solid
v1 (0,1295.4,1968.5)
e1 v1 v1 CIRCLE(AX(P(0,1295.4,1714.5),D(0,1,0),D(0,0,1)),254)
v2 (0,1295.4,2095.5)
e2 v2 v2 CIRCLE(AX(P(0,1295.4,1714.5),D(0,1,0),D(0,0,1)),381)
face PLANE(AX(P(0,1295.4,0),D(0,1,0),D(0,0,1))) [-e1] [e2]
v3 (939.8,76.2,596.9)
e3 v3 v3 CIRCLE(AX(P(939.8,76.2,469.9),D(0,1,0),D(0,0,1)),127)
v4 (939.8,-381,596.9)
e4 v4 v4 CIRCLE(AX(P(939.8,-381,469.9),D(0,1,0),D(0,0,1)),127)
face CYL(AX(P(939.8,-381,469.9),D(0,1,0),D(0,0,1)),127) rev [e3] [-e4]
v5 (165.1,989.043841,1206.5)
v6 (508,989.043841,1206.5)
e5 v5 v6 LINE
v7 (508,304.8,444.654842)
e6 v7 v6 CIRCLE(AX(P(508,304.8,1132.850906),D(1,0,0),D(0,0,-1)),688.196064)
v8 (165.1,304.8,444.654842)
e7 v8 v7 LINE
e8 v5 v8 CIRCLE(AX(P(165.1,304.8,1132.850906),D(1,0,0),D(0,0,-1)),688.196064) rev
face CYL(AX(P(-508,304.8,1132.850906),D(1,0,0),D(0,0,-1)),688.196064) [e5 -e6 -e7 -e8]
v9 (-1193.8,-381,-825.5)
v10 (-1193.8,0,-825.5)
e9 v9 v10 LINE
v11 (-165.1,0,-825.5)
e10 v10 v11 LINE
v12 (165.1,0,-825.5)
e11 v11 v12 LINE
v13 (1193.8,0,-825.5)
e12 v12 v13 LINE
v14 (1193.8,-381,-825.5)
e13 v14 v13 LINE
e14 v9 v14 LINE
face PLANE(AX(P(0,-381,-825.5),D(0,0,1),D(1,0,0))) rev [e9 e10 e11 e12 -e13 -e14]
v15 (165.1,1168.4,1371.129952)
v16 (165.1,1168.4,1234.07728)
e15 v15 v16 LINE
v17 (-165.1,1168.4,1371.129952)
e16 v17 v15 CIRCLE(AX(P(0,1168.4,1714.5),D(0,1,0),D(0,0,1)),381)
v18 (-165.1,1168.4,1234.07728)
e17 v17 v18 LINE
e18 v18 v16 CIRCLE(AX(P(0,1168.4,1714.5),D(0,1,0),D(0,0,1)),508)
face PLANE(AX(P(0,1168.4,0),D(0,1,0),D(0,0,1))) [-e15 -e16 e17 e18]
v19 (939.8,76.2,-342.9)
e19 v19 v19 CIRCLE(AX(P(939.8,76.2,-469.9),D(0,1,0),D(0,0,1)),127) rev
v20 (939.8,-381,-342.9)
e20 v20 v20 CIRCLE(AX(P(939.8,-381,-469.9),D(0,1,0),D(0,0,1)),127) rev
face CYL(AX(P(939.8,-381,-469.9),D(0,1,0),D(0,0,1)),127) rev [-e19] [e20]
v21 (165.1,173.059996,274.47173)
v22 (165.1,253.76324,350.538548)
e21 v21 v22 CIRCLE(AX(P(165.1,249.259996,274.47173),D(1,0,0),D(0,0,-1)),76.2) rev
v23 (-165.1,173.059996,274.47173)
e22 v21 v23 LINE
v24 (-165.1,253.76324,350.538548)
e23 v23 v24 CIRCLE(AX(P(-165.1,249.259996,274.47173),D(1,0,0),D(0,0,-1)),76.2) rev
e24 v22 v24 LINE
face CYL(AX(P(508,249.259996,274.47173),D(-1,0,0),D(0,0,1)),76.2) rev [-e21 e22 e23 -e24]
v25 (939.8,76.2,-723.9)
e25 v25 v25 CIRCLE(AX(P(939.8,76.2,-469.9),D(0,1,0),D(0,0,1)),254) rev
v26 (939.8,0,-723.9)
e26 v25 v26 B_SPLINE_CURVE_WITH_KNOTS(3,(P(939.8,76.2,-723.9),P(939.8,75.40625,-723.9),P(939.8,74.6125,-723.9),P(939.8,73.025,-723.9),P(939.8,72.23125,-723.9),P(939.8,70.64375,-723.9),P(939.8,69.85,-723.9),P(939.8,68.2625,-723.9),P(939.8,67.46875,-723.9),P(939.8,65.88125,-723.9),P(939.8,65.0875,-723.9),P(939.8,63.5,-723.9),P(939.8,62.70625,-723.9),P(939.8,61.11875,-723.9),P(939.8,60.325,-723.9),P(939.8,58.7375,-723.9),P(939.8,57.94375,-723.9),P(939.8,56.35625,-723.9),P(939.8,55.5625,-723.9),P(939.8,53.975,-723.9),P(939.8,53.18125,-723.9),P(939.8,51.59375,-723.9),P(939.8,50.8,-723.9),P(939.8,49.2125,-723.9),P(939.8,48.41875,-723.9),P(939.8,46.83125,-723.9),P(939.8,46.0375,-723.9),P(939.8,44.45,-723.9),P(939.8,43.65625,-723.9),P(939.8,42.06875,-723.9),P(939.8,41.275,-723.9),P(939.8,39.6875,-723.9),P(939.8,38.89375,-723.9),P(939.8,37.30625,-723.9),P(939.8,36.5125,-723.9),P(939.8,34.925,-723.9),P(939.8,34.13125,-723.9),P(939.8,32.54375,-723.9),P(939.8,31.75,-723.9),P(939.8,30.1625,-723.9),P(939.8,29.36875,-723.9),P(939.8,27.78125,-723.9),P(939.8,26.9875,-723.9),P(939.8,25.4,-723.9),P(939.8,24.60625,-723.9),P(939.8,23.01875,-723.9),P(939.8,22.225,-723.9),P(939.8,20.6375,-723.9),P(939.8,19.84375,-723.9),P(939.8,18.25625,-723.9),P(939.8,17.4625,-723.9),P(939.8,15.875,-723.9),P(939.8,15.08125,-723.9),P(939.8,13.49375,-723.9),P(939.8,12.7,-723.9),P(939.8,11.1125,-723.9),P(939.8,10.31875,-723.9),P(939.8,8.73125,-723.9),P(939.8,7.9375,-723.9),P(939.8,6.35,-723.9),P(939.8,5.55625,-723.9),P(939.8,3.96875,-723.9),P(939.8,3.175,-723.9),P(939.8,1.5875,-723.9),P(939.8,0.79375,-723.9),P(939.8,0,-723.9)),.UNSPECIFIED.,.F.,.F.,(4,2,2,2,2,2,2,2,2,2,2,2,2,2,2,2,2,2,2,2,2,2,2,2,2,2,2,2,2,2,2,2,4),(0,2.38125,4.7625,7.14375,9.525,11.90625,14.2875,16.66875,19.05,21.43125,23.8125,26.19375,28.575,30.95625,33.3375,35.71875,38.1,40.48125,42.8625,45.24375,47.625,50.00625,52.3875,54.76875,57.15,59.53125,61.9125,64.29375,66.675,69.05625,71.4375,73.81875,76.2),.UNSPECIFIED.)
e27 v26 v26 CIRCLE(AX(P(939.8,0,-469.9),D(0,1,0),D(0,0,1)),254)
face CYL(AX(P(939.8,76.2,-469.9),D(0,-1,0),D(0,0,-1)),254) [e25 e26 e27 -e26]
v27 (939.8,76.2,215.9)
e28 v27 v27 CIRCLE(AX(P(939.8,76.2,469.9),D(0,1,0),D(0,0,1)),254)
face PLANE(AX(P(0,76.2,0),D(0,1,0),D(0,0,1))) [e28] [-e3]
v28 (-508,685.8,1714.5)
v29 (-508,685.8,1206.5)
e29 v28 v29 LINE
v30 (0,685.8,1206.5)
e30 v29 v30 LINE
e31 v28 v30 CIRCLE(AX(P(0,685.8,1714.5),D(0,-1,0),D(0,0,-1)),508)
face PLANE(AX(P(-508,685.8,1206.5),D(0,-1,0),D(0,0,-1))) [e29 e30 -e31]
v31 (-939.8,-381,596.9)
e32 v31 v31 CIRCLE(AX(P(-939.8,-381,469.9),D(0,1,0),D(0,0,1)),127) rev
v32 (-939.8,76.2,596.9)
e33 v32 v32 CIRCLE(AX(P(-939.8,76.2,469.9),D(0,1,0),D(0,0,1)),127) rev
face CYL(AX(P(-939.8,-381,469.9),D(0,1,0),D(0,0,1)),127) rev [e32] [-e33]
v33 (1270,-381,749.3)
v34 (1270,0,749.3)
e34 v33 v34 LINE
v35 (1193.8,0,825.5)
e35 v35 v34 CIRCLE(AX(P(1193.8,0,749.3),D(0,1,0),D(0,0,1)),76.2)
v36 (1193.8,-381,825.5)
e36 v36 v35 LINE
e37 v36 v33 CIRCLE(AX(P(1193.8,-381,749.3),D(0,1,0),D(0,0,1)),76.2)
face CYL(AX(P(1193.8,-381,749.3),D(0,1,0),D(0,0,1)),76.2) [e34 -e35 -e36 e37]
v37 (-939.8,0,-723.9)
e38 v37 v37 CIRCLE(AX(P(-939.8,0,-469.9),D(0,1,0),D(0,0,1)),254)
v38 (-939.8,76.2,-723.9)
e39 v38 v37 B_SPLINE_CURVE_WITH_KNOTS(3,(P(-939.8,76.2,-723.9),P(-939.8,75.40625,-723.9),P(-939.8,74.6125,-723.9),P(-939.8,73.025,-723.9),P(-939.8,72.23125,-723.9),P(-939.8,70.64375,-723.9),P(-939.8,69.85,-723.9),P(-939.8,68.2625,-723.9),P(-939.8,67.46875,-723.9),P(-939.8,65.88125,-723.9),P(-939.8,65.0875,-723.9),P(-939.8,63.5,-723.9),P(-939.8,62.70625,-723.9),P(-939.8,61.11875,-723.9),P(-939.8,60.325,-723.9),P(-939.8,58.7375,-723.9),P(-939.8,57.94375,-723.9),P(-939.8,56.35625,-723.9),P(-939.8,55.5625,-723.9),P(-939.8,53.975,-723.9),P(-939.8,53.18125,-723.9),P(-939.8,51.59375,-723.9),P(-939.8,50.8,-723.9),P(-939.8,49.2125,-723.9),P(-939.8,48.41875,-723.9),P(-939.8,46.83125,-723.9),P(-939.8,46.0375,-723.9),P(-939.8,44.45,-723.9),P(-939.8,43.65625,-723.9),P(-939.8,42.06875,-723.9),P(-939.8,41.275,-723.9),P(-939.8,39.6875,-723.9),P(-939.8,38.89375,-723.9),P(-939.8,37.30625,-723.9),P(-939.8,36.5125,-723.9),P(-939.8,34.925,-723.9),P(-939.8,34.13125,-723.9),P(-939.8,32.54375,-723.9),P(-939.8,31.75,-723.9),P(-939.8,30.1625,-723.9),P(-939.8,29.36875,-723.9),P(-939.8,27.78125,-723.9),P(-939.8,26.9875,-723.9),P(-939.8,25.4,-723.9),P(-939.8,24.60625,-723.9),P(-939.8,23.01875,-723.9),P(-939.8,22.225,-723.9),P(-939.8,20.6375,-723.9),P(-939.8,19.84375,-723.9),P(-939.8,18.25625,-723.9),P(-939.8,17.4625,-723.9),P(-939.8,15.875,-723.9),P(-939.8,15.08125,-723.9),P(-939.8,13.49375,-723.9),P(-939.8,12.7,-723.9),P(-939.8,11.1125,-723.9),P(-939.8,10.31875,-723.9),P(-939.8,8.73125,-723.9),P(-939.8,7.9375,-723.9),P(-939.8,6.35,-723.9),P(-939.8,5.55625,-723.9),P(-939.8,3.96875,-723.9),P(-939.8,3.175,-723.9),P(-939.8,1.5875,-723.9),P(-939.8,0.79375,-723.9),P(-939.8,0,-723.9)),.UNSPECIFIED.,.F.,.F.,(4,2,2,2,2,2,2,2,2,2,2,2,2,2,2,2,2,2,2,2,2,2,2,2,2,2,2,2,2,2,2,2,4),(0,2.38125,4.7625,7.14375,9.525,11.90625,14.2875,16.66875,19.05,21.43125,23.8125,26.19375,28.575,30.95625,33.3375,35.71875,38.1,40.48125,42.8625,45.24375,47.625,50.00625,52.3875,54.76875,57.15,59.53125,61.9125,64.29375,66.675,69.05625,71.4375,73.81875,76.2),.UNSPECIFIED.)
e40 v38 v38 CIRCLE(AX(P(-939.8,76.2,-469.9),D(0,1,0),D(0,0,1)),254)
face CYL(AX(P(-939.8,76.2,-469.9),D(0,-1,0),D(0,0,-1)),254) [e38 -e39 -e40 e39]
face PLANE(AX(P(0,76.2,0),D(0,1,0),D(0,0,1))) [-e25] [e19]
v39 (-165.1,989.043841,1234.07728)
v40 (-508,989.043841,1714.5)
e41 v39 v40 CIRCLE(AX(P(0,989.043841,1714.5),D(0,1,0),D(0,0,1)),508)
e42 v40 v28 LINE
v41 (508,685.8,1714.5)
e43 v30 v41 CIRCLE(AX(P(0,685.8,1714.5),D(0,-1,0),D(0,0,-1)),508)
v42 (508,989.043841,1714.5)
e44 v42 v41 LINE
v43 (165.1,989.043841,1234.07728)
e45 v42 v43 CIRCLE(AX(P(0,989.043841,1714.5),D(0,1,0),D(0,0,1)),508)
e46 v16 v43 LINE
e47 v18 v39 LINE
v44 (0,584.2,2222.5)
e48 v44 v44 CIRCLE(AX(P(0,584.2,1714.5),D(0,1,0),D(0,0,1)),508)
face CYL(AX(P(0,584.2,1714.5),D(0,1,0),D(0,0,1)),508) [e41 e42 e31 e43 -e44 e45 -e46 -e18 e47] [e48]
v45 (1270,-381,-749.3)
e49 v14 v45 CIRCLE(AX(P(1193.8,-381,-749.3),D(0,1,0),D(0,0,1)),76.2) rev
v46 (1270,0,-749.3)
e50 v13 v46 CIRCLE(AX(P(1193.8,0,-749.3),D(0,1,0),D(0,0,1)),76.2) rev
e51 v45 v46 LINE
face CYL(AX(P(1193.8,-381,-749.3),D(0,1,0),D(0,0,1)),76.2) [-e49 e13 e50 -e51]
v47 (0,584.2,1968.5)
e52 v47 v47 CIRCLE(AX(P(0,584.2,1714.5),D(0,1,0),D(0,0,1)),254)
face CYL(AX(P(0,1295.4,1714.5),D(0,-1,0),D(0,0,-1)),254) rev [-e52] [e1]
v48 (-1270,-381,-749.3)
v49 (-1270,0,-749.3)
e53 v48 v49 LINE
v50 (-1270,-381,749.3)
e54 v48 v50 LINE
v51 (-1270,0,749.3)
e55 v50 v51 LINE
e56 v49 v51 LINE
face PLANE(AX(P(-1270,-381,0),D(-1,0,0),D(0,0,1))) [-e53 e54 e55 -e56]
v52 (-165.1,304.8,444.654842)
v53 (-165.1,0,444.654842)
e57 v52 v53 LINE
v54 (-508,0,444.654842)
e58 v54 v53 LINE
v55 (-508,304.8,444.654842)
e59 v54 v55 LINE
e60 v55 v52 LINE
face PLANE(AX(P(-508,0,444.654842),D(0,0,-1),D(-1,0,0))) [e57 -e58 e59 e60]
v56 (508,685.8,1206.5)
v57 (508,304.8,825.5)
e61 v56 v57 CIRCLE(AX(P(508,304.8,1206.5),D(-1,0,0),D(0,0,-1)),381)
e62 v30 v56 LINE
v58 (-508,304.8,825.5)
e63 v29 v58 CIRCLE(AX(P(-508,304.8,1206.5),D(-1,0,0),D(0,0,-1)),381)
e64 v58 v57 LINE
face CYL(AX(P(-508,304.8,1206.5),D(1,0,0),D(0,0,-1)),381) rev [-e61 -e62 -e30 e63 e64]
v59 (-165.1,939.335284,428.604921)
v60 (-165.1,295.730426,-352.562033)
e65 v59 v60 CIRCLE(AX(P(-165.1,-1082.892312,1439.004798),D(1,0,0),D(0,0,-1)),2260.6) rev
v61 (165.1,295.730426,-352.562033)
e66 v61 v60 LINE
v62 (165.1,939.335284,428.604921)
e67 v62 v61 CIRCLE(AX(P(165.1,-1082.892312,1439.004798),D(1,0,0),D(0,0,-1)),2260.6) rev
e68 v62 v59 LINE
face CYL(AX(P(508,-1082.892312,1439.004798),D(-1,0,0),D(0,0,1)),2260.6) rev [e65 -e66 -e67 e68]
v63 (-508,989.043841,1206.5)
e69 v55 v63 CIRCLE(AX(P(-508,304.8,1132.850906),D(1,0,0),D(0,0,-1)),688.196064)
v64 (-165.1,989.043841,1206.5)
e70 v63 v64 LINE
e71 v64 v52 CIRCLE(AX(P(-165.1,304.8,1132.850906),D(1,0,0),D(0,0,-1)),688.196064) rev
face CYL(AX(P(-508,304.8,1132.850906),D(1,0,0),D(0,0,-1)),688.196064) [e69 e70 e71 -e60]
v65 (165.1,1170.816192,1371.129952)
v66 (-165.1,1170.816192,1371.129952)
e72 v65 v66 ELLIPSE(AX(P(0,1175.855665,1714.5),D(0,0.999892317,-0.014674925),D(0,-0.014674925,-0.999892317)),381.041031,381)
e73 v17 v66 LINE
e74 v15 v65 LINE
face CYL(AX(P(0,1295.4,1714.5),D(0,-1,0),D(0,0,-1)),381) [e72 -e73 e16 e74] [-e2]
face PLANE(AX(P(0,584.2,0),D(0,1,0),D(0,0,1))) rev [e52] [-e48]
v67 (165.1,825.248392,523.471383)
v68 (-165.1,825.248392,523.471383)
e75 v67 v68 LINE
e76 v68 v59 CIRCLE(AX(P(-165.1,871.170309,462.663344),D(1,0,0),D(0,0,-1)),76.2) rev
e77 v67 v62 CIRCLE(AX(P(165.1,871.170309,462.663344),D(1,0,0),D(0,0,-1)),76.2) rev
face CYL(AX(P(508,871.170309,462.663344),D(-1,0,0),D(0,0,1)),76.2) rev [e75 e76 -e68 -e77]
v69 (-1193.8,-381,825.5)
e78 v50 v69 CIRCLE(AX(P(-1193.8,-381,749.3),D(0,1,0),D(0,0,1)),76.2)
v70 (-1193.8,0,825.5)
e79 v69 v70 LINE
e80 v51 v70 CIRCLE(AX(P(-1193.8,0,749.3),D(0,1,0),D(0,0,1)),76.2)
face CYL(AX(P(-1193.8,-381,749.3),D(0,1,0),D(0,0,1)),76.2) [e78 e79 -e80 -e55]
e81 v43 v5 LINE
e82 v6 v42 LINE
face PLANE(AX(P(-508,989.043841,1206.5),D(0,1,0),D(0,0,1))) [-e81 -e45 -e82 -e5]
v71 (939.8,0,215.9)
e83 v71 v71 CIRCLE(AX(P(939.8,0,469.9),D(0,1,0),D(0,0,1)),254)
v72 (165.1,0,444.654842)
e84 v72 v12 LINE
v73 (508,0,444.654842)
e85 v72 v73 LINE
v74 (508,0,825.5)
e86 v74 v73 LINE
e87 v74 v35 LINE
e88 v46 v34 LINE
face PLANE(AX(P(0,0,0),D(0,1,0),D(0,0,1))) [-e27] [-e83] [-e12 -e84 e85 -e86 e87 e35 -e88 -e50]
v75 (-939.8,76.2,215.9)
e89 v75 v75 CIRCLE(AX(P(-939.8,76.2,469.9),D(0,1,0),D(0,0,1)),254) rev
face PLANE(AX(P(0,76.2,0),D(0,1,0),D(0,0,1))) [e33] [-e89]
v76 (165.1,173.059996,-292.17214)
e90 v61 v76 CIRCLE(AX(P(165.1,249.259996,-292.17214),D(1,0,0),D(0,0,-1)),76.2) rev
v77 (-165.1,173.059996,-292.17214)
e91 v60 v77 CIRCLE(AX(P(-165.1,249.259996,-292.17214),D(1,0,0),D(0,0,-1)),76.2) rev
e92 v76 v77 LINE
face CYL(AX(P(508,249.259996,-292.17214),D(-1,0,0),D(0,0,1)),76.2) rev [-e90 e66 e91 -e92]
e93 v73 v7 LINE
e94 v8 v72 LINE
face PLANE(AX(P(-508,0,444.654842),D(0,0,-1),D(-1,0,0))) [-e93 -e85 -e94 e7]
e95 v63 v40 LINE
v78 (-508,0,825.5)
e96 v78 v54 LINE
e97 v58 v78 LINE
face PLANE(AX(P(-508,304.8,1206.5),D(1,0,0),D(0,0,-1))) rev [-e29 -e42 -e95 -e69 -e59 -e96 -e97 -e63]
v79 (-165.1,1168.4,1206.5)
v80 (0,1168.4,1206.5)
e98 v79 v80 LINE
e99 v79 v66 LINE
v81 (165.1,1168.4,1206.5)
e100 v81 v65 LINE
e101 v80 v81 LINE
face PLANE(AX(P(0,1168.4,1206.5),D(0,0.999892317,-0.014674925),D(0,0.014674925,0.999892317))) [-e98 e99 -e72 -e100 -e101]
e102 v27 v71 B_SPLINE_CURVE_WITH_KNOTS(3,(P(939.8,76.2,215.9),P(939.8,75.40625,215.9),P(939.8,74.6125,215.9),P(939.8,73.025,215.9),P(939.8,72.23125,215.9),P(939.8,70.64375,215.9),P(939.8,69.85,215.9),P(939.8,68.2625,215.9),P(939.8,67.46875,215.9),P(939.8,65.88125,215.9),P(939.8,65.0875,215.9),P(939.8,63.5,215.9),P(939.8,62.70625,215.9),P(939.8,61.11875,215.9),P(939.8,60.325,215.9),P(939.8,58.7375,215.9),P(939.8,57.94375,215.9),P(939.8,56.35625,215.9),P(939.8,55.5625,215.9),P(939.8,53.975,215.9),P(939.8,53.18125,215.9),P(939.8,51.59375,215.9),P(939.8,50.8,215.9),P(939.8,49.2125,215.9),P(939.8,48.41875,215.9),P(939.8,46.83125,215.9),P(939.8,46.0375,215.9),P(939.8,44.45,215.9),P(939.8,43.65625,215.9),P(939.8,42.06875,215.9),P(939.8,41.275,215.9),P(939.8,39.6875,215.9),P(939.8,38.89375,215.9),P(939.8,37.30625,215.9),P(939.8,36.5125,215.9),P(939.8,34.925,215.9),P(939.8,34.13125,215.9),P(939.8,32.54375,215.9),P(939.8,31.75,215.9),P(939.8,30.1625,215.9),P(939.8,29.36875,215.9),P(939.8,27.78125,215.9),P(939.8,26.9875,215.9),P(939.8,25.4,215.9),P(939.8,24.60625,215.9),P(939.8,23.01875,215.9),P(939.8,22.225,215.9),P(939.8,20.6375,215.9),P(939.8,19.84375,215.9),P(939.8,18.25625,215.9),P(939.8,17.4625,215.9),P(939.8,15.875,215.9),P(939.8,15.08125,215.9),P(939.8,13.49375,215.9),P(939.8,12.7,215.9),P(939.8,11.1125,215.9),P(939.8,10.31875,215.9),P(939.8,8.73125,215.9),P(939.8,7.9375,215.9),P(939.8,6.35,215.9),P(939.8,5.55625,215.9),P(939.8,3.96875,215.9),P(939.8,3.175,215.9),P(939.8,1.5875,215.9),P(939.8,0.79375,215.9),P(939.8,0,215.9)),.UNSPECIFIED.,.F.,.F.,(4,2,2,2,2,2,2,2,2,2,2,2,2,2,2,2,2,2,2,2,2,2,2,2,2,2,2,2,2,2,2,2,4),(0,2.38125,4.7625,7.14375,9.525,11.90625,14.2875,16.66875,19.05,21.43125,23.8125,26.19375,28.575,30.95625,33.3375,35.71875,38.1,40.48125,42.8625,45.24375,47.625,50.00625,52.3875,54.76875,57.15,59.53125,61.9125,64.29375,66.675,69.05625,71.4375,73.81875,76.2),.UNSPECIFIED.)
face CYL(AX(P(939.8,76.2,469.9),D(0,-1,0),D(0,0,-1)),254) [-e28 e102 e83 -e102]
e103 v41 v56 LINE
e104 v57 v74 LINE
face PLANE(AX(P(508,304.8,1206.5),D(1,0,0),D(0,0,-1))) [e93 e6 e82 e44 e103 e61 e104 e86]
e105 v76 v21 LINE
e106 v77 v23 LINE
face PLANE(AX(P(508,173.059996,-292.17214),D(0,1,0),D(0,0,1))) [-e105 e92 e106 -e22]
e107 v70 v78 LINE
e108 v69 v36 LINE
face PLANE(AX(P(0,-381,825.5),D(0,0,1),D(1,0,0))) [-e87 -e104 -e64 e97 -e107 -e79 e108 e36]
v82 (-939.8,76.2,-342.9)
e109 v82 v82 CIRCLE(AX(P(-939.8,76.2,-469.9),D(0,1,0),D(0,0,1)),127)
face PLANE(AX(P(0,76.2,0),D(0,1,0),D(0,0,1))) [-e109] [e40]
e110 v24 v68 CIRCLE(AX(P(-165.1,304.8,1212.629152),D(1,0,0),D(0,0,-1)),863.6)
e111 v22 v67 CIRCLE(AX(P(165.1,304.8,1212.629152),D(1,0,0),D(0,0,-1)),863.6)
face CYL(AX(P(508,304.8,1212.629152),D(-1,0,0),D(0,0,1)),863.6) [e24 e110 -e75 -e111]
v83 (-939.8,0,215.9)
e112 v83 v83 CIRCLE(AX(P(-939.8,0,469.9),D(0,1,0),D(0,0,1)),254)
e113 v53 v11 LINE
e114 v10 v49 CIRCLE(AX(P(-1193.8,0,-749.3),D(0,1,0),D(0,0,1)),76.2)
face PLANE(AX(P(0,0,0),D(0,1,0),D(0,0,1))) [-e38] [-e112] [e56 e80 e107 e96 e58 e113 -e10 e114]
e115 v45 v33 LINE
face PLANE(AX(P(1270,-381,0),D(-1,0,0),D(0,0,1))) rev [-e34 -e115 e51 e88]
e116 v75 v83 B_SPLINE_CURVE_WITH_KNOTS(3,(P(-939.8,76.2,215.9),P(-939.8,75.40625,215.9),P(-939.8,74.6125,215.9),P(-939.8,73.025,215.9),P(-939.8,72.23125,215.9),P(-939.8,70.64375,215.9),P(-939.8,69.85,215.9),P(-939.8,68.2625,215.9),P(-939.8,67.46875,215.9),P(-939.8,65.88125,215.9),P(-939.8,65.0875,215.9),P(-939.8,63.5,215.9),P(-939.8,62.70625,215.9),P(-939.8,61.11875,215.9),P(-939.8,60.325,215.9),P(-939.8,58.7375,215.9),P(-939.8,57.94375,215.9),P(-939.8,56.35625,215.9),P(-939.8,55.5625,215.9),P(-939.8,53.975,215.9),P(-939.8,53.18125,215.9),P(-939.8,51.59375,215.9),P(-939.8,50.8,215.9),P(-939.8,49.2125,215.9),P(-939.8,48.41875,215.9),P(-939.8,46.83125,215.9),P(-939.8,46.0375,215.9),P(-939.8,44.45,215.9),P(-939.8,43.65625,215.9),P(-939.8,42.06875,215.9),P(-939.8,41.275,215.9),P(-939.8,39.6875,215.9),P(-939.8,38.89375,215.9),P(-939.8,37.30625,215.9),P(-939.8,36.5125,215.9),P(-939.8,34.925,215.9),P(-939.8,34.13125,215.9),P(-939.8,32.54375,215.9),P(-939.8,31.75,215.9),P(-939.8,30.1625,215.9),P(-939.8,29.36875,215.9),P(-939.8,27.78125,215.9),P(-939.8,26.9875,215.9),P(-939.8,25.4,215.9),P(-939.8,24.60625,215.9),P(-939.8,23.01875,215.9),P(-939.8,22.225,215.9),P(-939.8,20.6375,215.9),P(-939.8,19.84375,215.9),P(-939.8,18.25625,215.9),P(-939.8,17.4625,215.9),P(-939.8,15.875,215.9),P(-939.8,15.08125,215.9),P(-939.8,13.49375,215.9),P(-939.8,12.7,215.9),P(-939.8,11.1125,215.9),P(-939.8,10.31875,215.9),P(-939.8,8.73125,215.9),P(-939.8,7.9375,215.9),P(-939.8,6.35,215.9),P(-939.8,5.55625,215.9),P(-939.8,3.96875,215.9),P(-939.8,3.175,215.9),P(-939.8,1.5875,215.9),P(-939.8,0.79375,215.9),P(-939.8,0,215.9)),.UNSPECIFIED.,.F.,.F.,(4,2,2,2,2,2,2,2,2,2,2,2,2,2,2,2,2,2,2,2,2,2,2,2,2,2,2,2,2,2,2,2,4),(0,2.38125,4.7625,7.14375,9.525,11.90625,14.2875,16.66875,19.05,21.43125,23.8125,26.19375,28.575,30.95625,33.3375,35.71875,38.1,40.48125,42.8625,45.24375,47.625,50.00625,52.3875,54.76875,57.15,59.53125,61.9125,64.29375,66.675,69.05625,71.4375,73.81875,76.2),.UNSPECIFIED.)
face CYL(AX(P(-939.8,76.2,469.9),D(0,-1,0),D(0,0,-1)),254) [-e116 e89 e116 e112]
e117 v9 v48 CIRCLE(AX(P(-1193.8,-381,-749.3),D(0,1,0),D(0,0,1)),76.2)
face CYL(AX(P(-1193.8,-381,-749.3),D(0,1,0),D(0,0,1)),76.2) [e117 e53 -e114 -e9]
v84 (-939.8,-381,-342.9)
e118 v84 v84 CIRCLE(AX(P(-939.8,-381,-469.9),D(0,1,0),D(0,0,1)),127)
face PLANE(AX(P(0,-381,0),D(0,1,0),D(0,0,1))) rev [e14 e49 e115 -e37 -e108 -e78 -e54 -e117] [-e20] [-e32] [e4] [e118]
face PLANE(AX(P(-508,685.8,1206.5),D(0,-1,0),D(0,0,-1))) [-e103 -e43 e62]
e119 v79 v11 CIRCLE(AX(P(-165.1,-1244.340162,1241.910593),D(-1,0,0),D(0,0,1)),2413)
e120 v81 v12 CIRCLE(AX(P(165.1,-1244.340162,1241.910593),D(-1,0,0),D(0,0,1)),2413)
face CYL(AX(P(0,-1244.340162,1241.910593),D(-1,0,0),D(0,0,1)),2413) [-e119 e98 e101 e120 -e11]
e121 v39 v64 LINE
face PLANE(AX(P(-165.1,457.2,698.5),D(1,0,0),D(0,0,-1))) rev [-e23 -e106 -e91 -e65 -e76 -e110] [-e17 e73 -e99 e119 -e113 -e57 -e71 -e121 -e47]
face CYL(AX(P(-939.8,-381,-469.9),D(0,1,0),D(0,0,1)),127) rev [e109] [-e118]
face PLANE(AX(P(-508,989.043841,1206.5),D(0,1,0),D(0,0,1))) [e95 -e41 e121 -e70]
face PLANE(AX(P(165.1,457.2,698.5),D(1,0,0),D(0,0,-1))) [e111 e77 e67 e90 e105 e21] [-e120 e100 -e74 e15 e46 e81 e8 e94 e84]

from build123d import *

# Parameters (mm, degrees)
SKETCH5_R                = 254
SKETCH5_R_2              = 127
BOSS_EXTRUDE2_DEPTH      = 381
BOSS_EXTRUDE3_START      = 76.2
SKETCH5_5_R              = 254
SKETCH5_5_R_2            = 127
BOSS_EXTRUDE3_DEPTH      = 76.2
SKETCH6_R                = 508
SKETCH6_R_2              = 381
BOSS_EXTRUDE4_DEPTH      = 584.2
BOSS_EXTRUDE5_DEPTH      = 127
BOSS_EXTRUDE5_DEPTH_BACK = 584.2
BOSS_EXTRUDE6_DEPTH      = 508
BOSS_EXTRUDE6_DEPTH_BACK = 508
CUT_EXTRUDE1_DEPTH       = 2904.34744305
RIB1_START               = -165.1
RIB1_DEPTH               = 330.2
CUT_EXTRUDE2_DEPTH       = 508
CUT_EXTRUDE2_DEPTH_BACK  = 508


# Read off the part's stored shape, not the designer's step: Rib1
with BuildPart() as part:
    # Sketch5 → Boss-Extrude2 (new body)
    # profile 1 of 5: a face of its own
    with BuildSketch(Plane(origin=(0, 0, 0), x_dir=(1, 0, 0), z_dir=(0, 1, 0))):
        with BuildLine():
            Line((-1193.8, -825.5), (1193.8, -825.5))
            ThreePointArc((1193.8, -825.5), (1247.681536726, -803.181536726), (1270, -749.3))
            Line((1270, -749.3), (1270, 749.3))
            ThreePointArc((1270, 749.3), (1247.681536726, 803.181536726), (1193.8, 825.5))
            Line((1193.8, 825.5), (-1193.8, 825.5))
            ThreePointArc((-1193.8, 825.5), (-1247.681536726, 803.181536726), (-1270, 749.3))
            Line((-1270, 749.3), (-1270, -749.3))
            ThreePointArc((-1270, -749.3), (-1247.681536726, -803.181536726), (-1193.8, -825.5))
        make_face()
        with Locations((939.8, -469.9)):
            Circle(SKETCH5_R, mode=Mode.SUBTRACT)
        with Locations((-939.8, 469.9)):
            Circle(SKETCH5_R, mode=Mode.SUBTRACT)
        with Locations((939.8, 469.9)):
            Circle(SKETCH5_R, mode=Mode.SUBTRACT)
        with Locations((-939.8, -469.9)):
            Circle(SKETCH5_R, mode=Mode.SUBTRACT)
    # profile 2 of 5: a face of its own
    with BuildSketch(Plane(origin=(0, 0, 0), x_dir=(1, 0, 0), z_dir=(0, 1, 0))):
        with Locations((-939.8, 469.9)):
            Circle(SKETCH5_R)
        with Locations(Location((-939.8, 469.9, 0), (0, 0, 270))):
            Circle(SKETCH5_R_2, mode=Mode.SUBTRACT)
    # profile 3 of 5: a face of its own
    with BuildSketch(Plane(origin=(0, 0, 0), x_dir=(1, 0, 0), z_dir=(0, 1, 0))):
        with Locations((-939.8, -469.9)):
            Circle(SKETCH5_R)
        with Locations(Location((-939.8, -469.9, 0), (0, 0, 270))):
            Circle(SKETCH5_R_2, mode=Mode.SUBTRACT)
    # profile 4 of 5: a face of its own
    with BuildSketch(Plane(origin=(0, 0, 0), x_dir=(1, 0, 0), z_dir=(0, 1, 0))):
        with Locations((939.8, -469.9)):
            Circle(SKETCH5_R)
        with Locations(Location((939.8, -469.9, 0), (0, 0, 270))):
            Circle(SKETCH5_R_2, mode=Mode.SUBTRACT)
    # profile 5 of 5: a face of its own
    with BuildSketch(Plane(origin=(0, 0, 0), x_dir=(1, 0, 0), z_dir=(0, 1, 0))):
        with Locations((939.8, 469.9)):
            Circle(SKETCH5_R)
        with Locations(Location((939.8, 469.9, 0), (0, 0, 270))):
            Circle(SKETCH5_R_2, mode=Mode.SUBTRACT)
    extrude(amount=-BOSS_EXTRUDE2_DEPTH)

    # Sketch5<5> → Boss-Extrude3 (add)
    # profile 1 of 4: a face of its own
    with BuildSketch(Plane(origin=(0, 0, 0), x_dir=(1, 0, 0), z_dir=(0, 1, 0)).offset(BOSS_EXTRUDE3_START)):
        with Locations(Location((-939.8, 469.9, 0), (0, 0, 90))):
            Circle(SKETCH5_5_R)
        with Locations(Location((-939.8, 469.9, 0), (0, 0, 270))):
            Circle(SKETCH5_5_R_2, mode=Mode.SUBTRACT)
    # profile 2 of 4: a face of its own
    with BuildSketch(Plane(origin=(0, 0, 0), x_dir=(1, 0, 0), z_dir=(0, 1, 0)).offset(BOSS_EXTRUDE3_START)):
        with Locations(Location((-939.8, -469.9, 0), (0, 0, 90))):
            Circle(SKETCH5_5_R)
        with Locations(Location((-939.8, -469.9, 0), (0, 0, 270))):
            Circle(SKETCH5_5_R_2, mode=Mode.SUBTRACT)
    # profile 3 of 4: a face of its own
    with BuildSketch(Plane(origin=(0, 0, 0), x_dir=(1, 0, 0), z_dir=(0, 1, 0)).offset(BOSS_EXTRUDE3_START)):
        with Locations(Location((939.8, 469.9, 0), (0, 0, 90))):
            Circle(SKETCH5_5_R)
        with Locations(Location((939.8, 469.9, 0), (0, 0, 270))):
            Circle(SKETCH5_5_R_2, mode=Mode.SUBTRACT)
    # profile 4 of 4: a face of its own
    with BuildSketch(Plane(origin=(0, 0, 0), x_dir=(1, 0, 0), z_dir=(0, 1, 0)).offset(BOSS_EXTRUDE3_START)):
        with Locations(Location((939.8, -469.9, 0), (0, 0, 90))):
            Circle(SKETCH5_5_R)
        with Locations(Location((939.8, -469.9, 0), (0, 0, 270))):
            Circle(SKETCH5_5_R_2, mode=Mode.SUBTRACT)
    extrude(amount=-BOSS_EXTRUDE3_DEPTH)



with BuildPart() as body_2:
    # Sketch6 → Boss-Extrude4 (new body)
    with BuildSketch(Plane(origin=(0, 1168.4, 0), x_dir=(1, 0, 0), z_dir=(0, 1, 0))):
        with Locations(Location((0, -1714.5, 0), (0, 0, 270))):
            Circle(SKETCH6_R)
        with Locations(Location((0, -1714.5, 0), (0, 0, 270))):
            Circle(SKETCH6_R_2, mode=Mode.SUBTRACT)
    extrude(amount=-BOSS_EXTRUDE4_DEPTH)

    # Sketch6<5> → Boss-Extrude5 (add, two sides: drawn at the far end of the back side and taken through both)
    with BuildSketch(Plane(origin=(0, 1168.4, 0), x_dir=(1, 0, 0), z_dir=(0, 1, 0)).offset(-BOSS_EXTRUDE5_DEPTH_BACK)):
        with BuildLine():
            ThreePointArc((381, -1714.5), (269.407683632, -1445.092316368), (0, -1333.5))
            Line((0, -1333.5), (0, -1460.5))
            ThreePointArc((0, -1460.5), (179.605122421, -1534.894877579), (254, -1714.5))
            ThreePointArc((254, -1714.5), (179.605122421, -1894.105122421), (0, -1968.5))
            Line((0, -1968.5), (0, -2095.5))
            ThreePointArc((0, -2095.5), (269.407683632, -1983.907683632), (381, -1714.5))
        make_face()
        with BuildLine():
            Line((0, -1460.5), (0, -1333.5))
            ThreePointArc((0, -1333.5), (-381, -1714.5), (0, -2095.5))
            Line((0, -2095.5), (0, -1968.5))
            ThreePointArc((0, -1968.5), (-254, -1714.5), (0, -1460.5))
        make_face()
        with BuildLine():
            ThreePointArc((381, -1714.5), (269.407683632, -1445.092316368), (0, -1333.5))
            Line((0, -1333.5), (0, -1460.5))
            ThreePointArc((0, -1460.5), (179.605122421, -1534.894877579), (254, -1714.5))
            ThreePointArc((254, -1714.5), (179.605122421, -1894.105122421), (0, -1968.5))
            Line((0, -1968.5), (0, -2095.5))
            ThreePointArc((0, -2095.5), (269.407683632, -1983.907683632), (381, -1714.5))
        make_face()
        with BuildLine():
            Line((0, -1460.5), (0, -1333.5))
            ThreePointArc((0, -1333.5), (-381, -1714.5), (0, -2095.5))
            Line((0, -2095.5), (0, -1968.5))
            ThreePointArc((0, -1968.5), (-254, -1714.5), (0, -1460.5))
        make_face()
    extrude(amount=BOSS_EXTRUDE5_DEPTH + BOSS_EXTRUDE5_DEPTH_BACK)


with BuildPart() as part_1:
    add(part.part)

    add(body_2.part)  # Boss-Extrude6 merges body 2
    # Sketch11 → Boss-Extrude6 (add, two sides: drawn at the far end of the back side and taken through both)
    with BuildSketch(Plane(origin=(0, 0, 0), x_dir=(0, 0, -1), z_dir=(1, 0, 0)).offset(-BOSS_EXTRUDE6_DEPTH_BACK)):
        with BuildLine():
            Line((-825.5, 0), (-825.5, 304.8))
            ThreePointArc((-825.5, 304.8), (-937.092316368, 574.207683632), (-1206.5, 685.8))
            Line((-1206.5, 685.8), (-1714.5, 685.8))
            Line((-1714.5, 685.8), (-1714.5, 989.043840563))
            Line((-1714.5, 989.043840563), (-1206.5, 989.043840563))
            ThreePointArc((-1206.5, 989.043840563), (-672.998317557, 816.80529258), (-444.654841735, 304.8))
            Line((-444.654841735, 304.8), (-444.654841735, 0))
            Line((-444.654841735, 0), (-825.5, 0))
        make_face()
    extrude(amount=BOSS_EXTRUDE6_DEPTH + BOSS_EXTRUDE6_DEPTH_BACK)

    # Sketch12 → Cut-Extrude1 (cut, through all)
    with BuildSketch(Plane(origin=(0, 989.043840563, 0), x_dir=(1, 0, 0), z_dir=(0, 1, 0))):
        with BuildLine():
            Line((-254, -1714.5), (254, -1714.5))
            ThreePointArc((254, -1714.5), (0, -1460.5), (-254, -1714.5))
        make_face()
    extrude(amount=-CUT_EXTRUDE1_DEPTH, mode=Mode.SUBTRACT)

    # Rib1 outline → Rib1 (add)
    with BuildSketch(Plane(origin=(0, 0, 0), x_dir=(0, 0, -1), z_dir=(1, 0, 0)).offset(RIB1_START)):
        with BuildLine():
            Line((-1373, 1170.843638094), (-1373, 971.12248932))
            Line((-1373, 971.12248932), (-1206.5, 989.043840563))
            ThreePointArc((-1206.5, 989.043840563), (-672.998317557, 816.80529258), (-444.654841735, 304.8))
            Line((-444.654841735, 304.8), (-444.654841735, 0))
            Line((-444.654841735, 0), (825.5, 0))
            ThreePointArc((825.5, 0), (-39.099770382, 847.504747162), (-1206.5, 1168.4))
            Line((-1206.5, 1168.4), (-1371.129951801, 1170.816192322))
            Line((-1371.129951801, 1170.816192322), (-1373, 1170.843638094))
        make_face()
    extrude(amount=RIB1_DEPTH)

    # Sketch15 → Cut-Extrude2 (cut, two sides: drawn at the far end of the back side and taken through both)
    with BuildSketch(Plane(origin=(0, 0, 0), x_dir=(0, 0, -1), z_dir=(1, 0, 0)).offset(-CUT_EXTRUDE2_DEPTH_BACK)):
        with BuildLine():
            Line((292.172139573, 173.059996376), (-274.471730256, 173.059996376))
            ThreePointArc((-274.471730256, 173.059996376), (-329.922551519, 196.994841433), (-350.538548236, 253.763239913))
            ThreePointArc((-350.538548236, 253.763239913), (-386.044795403, 554.926490817), (-523.471382692, 825.24839224))
            ThreePointArc((-523.471382692, 825.24839224), (-521.253789027, 919.88991283), (-428.604921426, 939.335284348))
            ThreePointArc((-428.604921426, 939.335284348), (-1.537872903, 661.814311273), (352.562032735, 295.730425725))
            ThreePointArc((352.562032735, 295.730425725), (360.536921136, 215.604437522), (292.172139573, 173.059996376))
        make_face()
    extrude(amount=CUT_EXTRUDE2_DEPTH + CUT_EXTRUDE2_DEPTH_BACK, mode=Mode.SUBTRACT)


solid = part_1.part
